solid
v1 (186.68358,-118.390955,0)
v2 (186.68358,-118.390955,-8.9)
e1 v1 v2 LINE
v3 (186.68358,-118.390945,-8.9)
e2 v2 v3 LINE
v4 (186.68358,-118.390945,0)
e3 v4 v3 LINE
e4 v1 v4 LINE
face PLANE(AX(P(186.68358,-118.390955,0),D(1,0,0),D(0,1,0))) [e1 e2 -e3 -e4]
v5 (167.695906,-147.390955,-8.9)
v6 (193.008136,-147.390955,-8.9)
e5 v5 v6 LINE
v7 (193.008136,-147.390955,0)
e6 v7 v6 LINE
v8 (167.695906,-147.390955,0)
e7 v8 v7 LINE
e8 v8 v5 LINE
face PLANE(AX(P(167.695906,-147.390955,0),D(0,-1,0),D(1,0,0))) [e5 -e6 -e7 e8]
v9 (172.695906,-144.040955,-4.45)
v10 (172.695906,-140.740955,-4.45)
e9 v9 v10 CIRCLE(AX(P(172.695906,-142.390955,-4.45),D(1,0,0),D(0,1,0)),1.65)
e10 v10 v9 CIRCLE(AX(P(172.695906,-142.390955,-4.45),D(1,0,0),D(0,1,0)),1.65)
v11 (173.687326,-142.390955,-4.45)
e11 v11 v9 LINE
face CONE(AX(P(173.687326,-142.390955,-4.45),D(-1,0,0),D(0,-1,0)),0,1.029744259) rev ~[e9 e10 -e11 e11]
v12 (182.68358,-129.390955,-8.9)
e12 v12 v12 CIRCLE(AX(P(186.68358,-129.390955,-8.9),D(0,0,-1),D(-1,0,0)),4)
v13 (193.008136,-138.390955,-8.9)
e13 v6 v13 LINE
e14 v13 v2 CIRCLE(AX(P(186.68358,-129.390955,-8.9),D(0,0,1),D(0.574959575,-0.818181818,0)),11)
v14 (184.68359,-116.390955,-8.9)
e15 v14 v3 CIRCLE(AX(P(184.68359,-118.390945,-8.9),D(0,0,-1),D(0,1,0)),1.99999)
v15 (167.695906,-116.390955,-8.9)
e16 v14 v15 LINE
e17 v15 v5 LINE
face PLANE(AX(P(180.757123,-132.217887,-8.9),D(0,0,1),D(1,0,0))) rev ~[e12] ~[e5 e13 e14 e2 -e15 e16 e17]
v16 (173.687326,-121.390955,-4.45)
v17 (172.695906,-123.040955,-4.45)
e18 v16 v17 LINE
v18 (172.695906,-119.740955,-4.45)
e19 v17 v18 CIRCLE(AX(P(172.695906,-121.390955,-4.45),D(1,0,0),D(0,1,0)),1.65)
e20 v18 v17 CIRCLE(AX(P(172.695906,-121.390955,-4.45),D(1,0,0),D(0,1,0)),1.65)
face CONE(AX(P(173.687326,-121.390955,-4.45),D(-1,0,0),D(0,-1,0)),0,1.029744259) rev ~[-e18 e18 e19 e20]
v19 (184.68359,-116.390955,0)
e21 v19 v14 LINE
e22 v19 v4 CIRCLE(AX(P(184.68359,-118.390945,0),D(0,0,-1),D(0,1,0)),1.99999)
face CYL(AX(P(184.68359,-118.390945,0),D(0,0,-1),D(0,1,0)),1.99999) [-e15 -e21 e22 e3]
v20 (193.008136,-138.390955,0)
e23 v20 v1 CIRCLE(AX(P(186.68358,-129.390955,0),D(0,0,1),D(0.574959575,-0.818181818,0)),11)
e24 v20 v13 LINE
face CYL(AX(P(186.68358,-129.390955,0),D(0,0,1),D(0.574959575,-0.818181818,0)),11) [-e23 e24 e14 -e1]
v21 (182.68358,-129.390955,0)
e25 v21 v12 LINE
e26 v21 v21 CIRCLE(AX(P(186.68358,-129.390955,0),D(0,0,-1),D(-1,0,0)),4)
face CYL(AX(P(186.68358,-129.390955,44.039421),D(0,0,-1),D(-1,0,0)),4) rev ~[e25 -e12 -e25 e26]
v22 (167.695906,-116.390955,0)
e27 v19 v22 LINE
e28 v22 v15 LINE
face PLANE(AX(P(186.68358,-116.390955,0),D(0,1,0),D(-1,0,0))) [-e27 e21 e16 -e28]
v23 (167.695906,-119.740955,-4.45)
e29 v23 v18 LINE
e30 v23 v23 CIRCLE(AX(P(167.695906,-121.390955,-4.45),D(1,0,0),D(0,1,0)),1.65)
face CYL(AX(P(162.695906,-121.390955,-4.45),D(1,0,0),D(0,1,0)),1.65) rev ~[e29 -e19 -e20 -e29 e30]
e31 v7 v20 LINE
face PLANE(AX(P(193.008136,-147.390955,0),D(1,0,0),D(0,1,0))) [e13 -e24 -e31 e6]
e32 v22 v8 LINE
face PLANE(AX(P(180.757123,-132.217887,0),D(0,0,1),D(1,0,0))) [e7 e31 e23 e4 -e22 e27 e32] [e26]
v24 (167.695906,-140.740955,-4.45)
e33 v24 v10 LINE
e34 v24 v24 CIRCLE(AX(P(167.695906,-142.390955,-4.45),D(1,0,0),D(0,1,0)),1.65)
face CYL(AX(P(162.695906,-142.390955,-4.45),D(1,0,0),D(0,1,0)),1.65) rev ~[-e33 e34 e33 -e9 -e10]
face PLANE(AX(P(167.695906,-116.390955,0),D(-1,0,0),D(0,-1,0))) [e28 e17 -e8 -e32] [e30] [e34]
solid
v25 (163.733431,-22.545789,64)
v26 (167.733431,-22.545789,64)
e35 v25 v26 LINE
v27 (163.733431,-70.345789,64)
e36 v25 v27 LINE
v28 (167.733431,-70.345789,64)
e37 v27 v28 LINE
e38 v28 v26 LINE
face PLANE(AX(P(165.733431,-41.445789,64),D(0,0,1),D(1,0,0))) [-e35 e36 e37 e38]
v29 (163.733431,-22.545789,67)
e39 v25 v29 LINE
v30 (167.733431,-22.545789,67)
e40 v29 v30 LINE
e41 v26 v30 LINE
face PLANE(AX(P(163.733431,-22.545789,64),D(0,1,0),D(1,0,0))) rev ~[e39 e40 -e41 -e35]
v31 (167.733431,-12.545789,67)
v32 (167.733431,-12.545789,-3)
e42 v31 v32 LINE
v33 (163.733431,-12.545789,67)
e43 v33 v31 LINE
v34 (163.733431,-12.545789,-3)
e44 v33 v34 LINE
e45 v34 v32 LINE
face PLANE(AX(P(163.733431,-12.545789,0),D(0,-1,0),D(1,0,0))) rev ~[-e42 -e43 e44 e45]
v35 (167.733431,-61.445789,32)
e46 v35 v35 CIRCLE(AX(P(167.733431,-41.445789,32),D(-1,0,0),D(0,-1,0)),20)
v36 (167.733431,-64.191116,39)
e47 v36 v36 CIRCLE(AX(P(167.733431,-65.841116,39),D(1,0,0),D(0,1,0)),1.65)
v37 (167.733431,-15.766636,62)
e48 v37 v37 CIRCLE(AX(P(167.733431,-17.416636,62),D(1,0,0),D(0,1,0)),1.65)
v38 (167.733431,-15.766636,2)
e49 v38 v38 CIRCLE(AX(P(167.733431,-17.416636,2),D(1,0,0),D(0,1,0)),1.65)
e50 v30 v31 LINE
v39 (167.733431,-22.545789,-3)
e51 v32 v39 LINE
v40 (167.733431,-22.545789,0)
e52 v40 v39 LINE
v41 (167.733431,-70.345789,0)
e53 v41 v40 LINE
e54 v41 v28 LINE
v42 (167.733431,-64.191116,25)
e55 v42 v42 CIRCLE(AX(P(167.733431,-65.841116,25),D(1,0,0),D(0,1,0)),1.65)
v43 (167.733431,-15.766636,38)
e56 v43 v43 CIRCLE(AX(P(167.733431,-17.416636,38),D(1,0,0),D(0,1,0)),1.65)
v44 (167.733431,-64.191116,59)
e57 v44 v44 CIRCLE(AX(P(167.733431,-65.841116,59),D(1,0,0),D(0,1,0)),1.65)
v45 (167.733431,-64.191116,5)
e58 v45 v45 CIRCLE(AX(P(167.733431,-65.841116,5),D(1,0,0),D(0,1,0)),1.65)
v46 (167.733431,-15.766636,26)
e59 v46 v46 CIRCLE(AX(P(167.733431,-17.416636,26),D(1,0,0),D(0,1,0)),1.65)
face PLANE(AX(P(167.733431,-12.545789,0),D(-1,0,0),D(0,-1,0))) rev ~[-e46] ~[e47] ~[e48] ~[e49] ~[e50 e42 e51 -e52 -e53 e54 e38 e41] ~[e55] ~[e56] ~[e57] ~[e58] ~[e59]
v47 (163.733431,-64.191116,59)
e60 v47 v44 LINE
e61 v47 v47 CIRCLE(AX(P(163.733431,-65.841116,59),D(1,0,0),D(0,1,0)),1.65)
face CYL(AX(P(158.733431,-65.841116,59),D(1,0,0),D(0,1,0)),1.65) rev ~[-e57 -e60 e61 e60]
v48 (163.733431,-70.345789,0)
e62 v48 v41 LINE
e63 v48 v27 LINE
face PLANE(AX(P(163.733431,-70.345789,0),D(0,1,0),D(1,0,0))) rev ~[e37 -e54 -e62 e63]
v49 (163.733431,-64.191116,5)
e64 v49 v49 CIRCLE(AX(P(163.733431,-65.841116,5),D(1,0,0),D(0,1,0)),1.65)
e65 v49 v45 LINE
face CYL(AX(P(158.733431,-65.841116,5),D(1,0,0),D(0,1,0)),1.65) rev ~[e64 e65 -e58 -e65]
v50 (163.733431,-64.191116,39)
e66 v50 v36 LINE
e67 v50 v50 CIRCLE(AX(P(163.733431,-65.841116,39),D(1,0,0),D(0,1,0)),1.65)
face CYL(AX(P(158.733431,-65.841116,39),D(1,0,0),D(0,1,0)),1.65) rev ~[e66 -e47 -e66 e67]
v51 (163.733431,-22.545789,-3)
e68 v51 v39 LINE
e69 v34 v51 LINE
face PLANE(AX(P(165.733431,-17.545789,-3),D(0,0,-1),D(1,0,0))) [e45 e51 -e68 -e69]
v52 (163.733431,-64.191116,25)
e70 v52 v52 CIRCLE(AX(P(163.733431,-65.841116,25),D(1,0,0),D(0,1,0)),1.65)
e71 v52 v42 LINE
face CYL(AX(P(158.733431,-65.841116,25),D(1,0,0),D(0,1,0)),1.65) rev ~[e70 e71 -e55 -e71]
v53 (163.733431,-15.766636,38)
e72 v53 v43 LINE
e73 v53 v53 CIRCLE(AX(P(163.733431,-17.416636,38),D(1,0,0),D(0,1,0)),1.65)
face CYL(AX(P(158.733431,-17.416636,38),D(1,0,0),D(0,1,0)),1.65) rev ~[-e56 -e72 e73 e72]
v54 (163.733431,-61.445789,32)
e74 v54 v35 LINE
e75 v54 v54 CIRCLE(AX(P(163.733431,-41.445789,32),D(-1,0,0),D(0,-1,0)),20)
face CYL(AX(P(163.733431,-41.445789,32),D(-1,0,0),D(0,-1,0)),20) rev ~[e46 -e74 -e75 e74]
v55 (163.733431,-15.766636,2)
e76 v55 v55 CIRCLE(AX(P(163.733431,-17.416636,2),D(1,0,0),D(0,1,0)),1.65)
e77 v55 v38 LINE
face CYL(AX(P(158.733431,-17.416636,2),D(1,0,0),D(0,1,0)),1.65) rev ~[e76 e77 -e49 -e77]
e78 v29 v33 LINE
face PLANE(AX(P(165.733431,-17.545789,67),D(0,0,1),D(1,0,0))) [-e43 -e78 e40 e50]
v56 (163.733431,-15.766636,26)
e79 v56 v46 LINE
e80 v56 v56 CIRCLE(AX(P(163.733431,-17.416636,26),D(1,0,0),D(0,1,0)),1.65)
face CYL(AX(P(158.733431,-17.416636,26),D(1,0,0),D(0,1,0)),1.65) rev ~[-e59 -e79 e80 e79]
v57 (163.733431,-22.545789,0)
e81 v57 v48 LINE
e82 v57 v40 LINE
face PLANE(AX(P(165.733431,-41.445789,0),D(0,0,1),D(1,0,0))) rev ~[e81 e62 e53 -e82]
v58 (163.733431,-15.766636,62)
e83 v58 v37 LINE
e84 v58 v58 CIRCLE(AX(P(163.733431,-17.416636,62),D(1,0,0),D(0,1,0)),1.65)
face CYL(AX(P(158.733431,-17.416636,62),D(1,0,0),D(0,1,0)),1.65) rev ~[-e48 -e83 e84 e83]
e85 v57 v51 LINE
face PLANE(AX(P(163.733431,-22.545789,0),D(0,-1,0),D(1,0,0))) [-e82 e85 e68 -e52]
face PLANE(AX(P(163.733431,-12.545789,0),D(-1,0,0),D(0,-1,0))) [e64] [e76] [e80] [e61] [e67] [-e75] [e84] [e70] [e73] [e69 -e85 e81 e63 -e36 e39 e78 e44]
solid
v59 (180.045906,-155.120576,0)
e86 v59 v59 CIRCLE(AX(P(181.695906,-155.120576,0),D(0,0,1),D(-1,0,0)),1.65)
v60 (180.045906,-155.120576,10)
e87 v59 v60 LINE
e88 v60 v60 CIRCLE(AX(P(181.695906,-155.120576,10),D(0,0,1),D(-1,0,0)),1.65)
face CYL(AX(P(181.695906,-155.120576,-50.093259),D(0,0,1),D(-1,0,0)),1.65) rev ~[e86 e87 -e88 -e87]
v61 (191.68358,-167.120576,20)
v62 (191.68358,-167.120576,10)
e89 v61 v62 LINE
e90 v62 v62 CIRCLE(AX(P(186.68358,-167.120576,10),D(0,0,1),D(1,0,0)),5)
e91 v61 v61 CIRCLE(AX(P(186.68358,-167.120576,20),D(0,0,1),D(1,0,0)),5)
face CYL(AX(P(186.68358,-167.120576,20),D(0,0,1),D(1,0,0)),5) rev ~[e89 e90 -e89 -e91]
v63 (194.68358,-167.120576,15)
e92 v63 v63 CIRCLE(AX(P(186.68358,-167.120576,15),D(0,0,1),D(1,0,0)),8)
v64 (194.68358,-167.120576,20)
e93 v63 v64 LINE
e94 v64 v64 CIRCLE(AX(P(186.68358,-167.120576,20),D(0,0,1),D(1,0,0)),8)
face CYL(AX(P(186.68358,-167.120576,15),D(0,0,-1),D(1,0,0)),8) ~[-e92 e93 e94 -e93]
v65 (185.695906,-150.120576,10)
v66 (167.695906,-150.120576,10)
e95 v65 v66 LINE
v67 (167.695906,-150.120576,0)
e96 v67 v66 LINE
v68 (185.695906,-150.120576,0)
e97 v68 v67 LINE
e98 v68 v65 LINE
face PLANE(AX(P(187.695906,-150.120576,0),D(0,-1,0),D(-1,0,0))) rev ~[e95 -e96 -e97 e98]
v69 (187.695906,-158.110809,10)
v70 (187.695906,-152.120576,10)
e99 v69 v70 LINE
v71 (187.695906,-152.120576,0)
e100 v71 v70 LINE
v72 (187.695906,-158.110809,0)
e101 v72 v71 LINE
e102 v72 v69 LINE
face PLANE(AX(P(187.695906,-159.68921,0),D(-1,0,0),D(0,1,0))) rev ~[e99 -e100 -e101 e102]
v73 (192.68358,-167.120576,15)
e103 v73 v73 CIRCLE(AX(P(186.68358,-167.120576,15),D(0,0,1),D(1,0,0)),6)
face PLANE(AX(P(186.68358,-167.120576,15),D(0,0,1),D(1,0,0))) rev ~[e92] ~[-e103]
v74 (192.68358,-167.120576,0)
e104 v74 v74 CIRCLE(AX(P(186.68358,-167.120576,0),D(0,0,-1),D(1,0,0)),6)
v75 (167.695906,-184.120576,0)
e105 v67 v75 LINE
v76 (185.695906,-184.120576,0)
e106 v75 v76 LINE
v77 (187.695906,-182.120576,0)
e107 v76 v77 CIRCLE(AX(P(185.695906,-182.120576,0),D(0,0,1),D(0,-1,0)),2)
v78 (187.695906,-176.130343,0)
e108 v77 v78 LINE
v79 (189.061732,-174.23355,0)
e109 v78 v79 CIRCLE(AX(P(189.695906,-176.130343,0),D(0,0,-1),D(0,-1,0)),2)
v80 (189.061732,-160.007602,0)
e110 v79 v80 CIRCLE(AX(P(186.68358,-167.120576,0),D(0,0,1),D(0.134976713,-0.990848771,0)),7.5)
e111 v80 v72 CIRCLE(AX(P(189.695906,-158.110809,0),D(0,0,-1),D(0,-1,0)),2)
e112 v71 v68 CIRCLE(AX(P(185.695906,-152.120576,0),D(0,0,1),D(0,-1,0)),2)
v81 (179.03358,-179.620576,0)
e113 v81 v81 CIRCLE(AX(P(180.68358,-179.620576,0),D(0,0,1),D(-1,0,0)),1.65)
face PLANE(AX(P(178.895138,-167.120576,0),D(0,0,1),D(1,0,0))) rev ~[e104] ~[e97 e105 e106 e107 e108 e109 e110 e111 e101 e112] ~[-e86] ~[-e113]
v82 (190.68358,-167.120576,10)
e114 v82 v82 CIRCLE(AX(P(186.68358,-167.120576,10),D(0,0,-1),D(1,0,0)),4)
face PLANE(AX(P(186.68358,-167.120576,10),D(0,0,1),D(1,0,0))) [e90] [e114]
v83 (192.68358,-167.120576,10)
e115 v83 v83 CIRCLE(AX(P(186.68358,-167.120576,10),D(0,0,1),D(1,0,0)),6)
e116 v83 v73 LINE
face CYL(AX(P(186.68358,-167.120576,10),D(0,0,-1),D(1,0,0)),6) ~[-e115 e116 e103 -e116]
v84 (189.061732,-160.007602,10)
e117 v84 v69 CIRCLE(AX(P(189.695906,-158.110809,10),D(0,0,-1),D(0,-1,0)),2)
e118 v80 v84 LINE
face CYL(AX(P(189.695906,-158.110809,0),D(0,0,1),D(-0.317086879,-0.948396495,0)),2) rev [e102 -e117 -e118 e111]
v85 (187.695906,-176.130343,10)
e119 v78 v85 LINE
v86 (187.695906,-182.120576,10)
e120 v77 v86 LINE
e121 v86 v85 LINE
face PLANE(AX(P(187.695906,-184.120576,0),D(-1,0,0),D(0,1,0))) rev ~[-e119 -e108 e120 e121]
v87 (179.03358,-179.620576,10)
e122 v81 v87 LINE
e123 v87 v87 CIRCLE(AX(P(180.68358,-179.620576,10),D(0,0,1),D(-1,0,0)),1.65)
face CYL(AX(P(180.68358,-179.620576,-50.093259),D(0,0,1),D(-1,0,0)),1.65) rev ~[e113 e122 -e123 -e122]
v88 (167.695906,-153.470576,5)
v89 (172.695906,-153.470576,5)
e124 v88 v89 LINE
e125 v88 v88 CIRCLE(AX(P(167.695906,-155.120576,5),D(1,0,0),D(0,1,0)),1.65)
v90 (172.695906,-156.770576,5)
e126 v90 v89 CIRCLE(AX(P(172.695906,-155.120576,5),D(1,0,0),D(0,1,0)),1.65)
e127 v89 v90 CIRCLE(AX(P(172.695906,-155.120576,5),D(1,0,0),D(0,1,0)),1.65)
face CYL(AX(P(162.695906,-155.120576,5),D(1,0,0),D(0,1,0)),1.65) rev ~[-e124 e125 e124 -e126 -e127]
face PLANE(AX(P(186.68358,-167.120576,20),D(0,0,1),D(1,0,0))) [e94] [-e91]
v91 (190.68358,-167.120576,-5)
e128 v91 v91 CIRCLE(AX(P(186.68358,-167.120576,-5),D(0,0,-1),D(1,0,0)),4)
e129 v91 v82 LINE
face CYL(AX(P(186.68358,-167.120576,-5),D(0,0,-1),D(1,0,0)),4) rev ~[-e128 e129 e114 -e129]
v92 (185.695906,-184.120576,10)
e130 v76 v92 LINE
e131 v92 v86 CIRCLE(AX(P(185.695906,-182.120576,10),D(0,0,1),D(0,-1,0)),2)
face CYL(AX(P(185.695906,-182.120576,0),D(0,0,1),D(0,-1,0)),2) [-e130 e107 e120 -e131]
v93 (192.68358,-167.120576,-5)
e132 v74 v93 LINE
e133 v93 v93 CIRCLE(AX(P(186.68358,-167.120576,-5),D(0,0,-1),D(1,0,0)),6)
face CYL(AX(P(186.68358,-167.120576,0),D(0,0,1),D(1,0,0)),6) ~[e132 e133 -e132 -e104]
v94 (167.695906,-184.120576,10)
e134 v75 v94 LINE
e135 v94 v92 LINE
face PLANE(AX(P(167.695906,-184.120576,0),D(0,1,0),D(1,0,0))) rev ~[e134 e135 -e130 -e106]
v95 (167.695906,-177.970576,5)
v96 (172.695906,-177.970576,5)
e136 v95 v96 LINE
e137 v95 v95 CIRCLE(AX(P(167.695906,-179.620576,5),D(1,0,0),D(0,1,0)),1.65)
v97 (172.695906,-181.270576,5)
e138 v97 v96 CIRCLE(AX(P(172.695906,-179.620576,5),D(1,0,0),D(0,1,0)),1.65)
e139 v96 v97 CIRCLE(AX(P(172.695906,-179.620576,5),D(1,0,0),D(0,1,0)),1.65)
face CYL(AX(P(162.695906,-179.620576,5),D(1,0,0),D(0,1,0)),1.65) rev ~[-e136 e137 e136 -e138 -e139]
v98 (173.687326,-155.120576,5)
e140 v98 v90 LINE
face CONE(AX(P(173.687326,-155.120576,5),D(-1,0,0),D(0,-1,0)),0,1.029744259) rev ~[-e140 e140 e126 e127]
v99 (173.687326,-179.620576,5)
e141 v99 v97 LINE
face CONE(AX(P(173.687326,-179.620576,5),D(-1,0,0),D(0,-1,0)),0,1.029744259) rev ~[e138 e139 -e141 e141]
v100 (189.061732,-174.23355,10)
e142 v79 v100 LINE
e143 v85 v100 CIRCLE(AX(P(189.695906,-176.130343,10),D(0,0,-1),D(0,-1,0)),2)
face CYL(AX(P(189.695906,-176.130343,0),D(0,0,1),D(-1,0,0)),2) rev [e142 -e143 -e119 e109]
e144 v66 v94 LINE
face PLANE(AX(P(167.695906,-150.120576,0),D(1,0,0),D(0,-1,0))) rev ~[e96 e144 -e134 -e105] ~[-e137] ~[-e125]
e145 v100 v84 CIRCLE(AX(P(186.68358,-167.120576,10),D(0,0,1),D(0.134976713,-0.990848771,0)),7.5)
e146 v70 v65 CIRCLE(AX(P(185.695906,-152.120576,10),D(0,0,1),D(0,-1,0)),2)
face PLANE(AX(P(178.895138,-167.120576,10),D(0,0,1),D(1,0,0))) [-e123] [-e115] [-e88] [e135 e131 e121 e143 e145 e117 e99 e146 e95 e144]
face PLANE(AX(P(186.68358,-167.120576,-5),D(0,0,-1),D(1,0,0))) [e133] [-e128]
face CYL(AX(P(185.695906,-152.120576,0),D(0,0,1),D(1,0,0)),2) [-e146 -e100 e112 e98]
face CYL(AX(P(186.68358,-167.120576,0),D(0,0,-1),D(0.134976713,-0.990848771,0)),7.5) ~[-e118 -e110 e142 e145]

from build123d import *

# Parameters (mm, degrees)
F3_DEPTH  = 10
F4_R      = 2
F5_R      = 2
F6_R      = 6
F7_DEPTH  = 5
F8_R      = 8
F9_DEPTH  = 5
F10_R     = 6
F11_DEPTH = 5
F12_R     = 5
F13_DEPTH = 10
F14_R     = 4
F15_DEPTH = 25
F16_D     = 3.3
F18_D     = 3.3
F18_DEPTH = 5
F18_TIP   = 0.9914200214
F20_DEPTH = 8.9
F21_R     = 1.99999
F22_D     = 8
F24_D     = 3.3
F24_DEPTH = 5
F24_TIP   = 0.9914200214
F25_DEPTH = 64
F26_R     = 20
F27_DEPTH = 33.9511494169
F28_W     = 4
F28_H     = 10
F29_DEPTH = 3
F30_W     = 4
F30_H     = 10
F31_DEPTH = 3
F33_D     = 3.3
F33_DEPTH = 5
F33_TIP   = 0.9914200214


# Not quite as in the source:
# - a fillet or chamfer is up to 0.001 mm smaller than in the source, because OpenCascade refuses the exact size


with BuildPart() as f3:
    # F2 (on Top) → F3 (new body)
    with BuildSketch(Plane.XY):
        with BuildLine():
            Line((167.6959056258, -150.1205759048), (167.6959056258, -184.1205759048))
            Line((167.6959056258, -184.1205759048), (187.6959056258, -184.1205759048))
            Line((187.6959056258, -184.1205759048), (187.6959056258, -174.5519416873))
            ThreePointArc((187.6959056258, -174.5519416873), (194.1835802794, -167.1205759048), (187.6959056258, -159.6892101224))
            Line((187.6959056258, -159.6892101224), (187.6959056258, -150.1205759048))
            Line((187.6959056258, -150.1205759048), (167.6959056258, -150.1205759048))
        make_face()
    extrude(amount=F3_DEPTH)

    # F4
    f4_edges = [f3.edges().sort_by_distance(p)[0] for p in [
        (187.695906, -184.120576, 5),
        (187.695906, -150.120576, 5),
    ]]
    fillet(f4_edges, radius=F4_R)

    # F5
    f5_edges = [f3.edges().sort_by_distance(p)[0] for p in [
        (187.695906, -174.551942, 5),
        (187.695906, -159.68921, 5),
    ]]
    fillet(f5_edges, radius=F5_R)

    # F6 (on face) → F7 (join)
    with BuildSketch(Plane.XY.offset(10)):
        with Locations((186.6835802794, -167.1205759048)):
            Circle(F6_R)
    extrude(amount=F7_DEPTH)

    # F8 (on face) → F9 (join)
    with BuildSketch(Plane.XY.offset(15)):
        with Locations((186.6835802794, -167.1205759048)):
            Circle(F8_R)
    extrude(amount=F9_DEPTH)

    # F10 (on face) → F11 (join)
    with BuildSketch(Plane(origin=(0, 0, 0), x_dir=(1, 0, 0), z_dir=(0, 0, -1))):
        with Locations((186.6835802794, 167.1205759048)):
            Circle(F10_R)
    extrude(amount=F11_DEPTH)

    # F12 (on face) → F13 (cut)
    with BuildSketch(Plane.XY.offset(20)):
        with Locations((186.6835802794, -167.1205759048)):
            Circle(F12_R)
    extrude(amount=-F13_DEPTH, mode=Mode.SUBTRACT)

    # F14 (on face) → F15 (cut, through all)
    with BuildSketch(Plane(origin=(0, 0, -5), x_dir=(1, 0, 0), z_dir=(0, 0, -1))):
        with Locations((186.6835802794, 167.1205759048)):
            Circle(F14_R)
    extrude(amount=-F15_DEPTH, mode=Mode.SUBTRACT)

    # F16 (through all)
    with Locations(Plane(origin=(0, 0, 0), x_dir=(1, 0, 0), z_dir=(0, 0, -1))):
        with Locations((180.6835802794, 179.6205759048), (181.6959056258, 155.1205759048)):
            Hole(F16_D / 2)

    # F18
    with Locations(Plane(origin=(167.6959056258, 0, 0), x_dir=(0, -1, 0), z_dir=(-1, 0, 0))):
        with Locations((155.1205759048, 5), (179.6205759048, 5)):
            Hole(F18_D / 2, depth=F18_DEPTH)
            with Locations((0, 0, -(F18_DEPTH + F18_TIP / 2))):  # 118° drill point
                Cone(0, F18_D / 2, F18_TIP, mode=Mode.SUBTRACT)


with BuildPart() as f20:
    # F19 (on Top) → F20 (new body)
    with BuildSketch(Plane.XY):
        with BuildLine():
            Line((186.6835802794, -116.3909549713), (167.6959056258, -116.3909549713))
            Line((167.6959056258, -116.3909549713), (167.6959056258, -147.3909549713))
            Line((167.6959056258, -147.3909549713), (193.0081355997, -147.3909549713))
            Line((193.0081355997, -147.3909549713), (193.0081355997, -138.3909549713))
            ThreePointArc((193.0081355997, -138.3909549713), (197.1716687611, -126.074330181), (186.6835802794, -118.3909549713))
            Line((186.6835802794, -118.3909549713), (186.6835802794, -116.3909549713))
        make_face()
    extrude(amount=-F20_DEPTH)

    # F21 (radius 2 in the source; OpenCascade refuses exactly that, so slightly less here)
    f21_edges = [f20.edges().sort_by_distance(p)[0] for p in [
        (186.68358, -116.390955, -4.45),
    ]]
    fillet(f21_edges, radius=F21_R)

    # F22 (through all)
    with Locations(Plane.XY):
        with Locations((186.6835802794, -129.3909549713)):
            Hole(F22_D / 2)

    # F24
    with Locations(Plane(origin=(167.6959056258, 0, 0), x_dir=(0, -1, 0), z_dir=(-1, 0, 0))):
        with Locations((121.3909549713, -4.45), (142.3909549713, -4.45)):
            Hole(F24_D / 2, depth=F24_DEPTH)
            with Locations((0, 0, -(F24_DEPTH + F24_TIP / 2))):  # 118° drill point
                Cone(0, F24_D / 2, F24_TIP, mode=Mode.SUBTRACT)


with BuildPart() as f25:
    # F1 (on Top) → F25 (new body)
    with BuildSketch(Plane.XY):
        Polygon((167.7334308624, -70.3457891941), (167.7334308624, -61.3457891941), (167.7334308624, -12.5457891941), (163.7334308624, -12.5457891941), (163.7334308624, -70.3457891941), align=None)
    extrude(amount=F25_DEPTH)

    # F26 (on face) → F27 (cut, through all)
    with BuildSketch(Plane(origin=(163.7334308624, 0, 0), x_dir=(0, -1, 0), z_dir=(-1, 0, 0))):
        with Locations((41.4457891941, 32)):
            Circle(F26_R)
    extrude(amount=-F27_DEPTH, mode=Mode.SUBTRACT)

    # F28 (on face) → F29 (join)
    with BuildSketch(Plane.XY.offset(64)):
        with Locations((165.7334308624, -17.5457891941)):
            Rectangle(F28_W, F28_H)
    extrude(amount=F29_DEPTH)

    # F30 (on face) → F31 (join)
    with BuildSketch(Plane(origin=(0, 0, 0), x_dir=(1, 0, 0), z_dir=(0, 0, -1))):
        with Locations((165.7334308624, 17.5457891941)):
            Rectangle(F30_W, F30_H)
    extrude(amount=F31_DEPTH)

    # F33
    with Locations(Plane(origin=(163.7334308624, 0, 0), x_dir=(0, -1, 0), z_dir=(-1, 0, 0))):
        with Locations((17.4166355282, 2), (17.4166355282, 62), (65.8411160111, 59), (65.8411160111, 5), (17.4166355282, 26), (17.4166355282, 38), (65.8411160111, 25), (65.8411160111, 39)):
            Hole(F33_D / 2, depth=F33_DEPTH)
            with Locations((0, 0, -(F33_DEPTH + F33_TIP / 2))):  # 118° drill point
                Cone(0, F33_D / 2, F33_TIP, mode=Mode.SUBTRACT)


solid = Compound([f3.part, f20.part, f25.part])
